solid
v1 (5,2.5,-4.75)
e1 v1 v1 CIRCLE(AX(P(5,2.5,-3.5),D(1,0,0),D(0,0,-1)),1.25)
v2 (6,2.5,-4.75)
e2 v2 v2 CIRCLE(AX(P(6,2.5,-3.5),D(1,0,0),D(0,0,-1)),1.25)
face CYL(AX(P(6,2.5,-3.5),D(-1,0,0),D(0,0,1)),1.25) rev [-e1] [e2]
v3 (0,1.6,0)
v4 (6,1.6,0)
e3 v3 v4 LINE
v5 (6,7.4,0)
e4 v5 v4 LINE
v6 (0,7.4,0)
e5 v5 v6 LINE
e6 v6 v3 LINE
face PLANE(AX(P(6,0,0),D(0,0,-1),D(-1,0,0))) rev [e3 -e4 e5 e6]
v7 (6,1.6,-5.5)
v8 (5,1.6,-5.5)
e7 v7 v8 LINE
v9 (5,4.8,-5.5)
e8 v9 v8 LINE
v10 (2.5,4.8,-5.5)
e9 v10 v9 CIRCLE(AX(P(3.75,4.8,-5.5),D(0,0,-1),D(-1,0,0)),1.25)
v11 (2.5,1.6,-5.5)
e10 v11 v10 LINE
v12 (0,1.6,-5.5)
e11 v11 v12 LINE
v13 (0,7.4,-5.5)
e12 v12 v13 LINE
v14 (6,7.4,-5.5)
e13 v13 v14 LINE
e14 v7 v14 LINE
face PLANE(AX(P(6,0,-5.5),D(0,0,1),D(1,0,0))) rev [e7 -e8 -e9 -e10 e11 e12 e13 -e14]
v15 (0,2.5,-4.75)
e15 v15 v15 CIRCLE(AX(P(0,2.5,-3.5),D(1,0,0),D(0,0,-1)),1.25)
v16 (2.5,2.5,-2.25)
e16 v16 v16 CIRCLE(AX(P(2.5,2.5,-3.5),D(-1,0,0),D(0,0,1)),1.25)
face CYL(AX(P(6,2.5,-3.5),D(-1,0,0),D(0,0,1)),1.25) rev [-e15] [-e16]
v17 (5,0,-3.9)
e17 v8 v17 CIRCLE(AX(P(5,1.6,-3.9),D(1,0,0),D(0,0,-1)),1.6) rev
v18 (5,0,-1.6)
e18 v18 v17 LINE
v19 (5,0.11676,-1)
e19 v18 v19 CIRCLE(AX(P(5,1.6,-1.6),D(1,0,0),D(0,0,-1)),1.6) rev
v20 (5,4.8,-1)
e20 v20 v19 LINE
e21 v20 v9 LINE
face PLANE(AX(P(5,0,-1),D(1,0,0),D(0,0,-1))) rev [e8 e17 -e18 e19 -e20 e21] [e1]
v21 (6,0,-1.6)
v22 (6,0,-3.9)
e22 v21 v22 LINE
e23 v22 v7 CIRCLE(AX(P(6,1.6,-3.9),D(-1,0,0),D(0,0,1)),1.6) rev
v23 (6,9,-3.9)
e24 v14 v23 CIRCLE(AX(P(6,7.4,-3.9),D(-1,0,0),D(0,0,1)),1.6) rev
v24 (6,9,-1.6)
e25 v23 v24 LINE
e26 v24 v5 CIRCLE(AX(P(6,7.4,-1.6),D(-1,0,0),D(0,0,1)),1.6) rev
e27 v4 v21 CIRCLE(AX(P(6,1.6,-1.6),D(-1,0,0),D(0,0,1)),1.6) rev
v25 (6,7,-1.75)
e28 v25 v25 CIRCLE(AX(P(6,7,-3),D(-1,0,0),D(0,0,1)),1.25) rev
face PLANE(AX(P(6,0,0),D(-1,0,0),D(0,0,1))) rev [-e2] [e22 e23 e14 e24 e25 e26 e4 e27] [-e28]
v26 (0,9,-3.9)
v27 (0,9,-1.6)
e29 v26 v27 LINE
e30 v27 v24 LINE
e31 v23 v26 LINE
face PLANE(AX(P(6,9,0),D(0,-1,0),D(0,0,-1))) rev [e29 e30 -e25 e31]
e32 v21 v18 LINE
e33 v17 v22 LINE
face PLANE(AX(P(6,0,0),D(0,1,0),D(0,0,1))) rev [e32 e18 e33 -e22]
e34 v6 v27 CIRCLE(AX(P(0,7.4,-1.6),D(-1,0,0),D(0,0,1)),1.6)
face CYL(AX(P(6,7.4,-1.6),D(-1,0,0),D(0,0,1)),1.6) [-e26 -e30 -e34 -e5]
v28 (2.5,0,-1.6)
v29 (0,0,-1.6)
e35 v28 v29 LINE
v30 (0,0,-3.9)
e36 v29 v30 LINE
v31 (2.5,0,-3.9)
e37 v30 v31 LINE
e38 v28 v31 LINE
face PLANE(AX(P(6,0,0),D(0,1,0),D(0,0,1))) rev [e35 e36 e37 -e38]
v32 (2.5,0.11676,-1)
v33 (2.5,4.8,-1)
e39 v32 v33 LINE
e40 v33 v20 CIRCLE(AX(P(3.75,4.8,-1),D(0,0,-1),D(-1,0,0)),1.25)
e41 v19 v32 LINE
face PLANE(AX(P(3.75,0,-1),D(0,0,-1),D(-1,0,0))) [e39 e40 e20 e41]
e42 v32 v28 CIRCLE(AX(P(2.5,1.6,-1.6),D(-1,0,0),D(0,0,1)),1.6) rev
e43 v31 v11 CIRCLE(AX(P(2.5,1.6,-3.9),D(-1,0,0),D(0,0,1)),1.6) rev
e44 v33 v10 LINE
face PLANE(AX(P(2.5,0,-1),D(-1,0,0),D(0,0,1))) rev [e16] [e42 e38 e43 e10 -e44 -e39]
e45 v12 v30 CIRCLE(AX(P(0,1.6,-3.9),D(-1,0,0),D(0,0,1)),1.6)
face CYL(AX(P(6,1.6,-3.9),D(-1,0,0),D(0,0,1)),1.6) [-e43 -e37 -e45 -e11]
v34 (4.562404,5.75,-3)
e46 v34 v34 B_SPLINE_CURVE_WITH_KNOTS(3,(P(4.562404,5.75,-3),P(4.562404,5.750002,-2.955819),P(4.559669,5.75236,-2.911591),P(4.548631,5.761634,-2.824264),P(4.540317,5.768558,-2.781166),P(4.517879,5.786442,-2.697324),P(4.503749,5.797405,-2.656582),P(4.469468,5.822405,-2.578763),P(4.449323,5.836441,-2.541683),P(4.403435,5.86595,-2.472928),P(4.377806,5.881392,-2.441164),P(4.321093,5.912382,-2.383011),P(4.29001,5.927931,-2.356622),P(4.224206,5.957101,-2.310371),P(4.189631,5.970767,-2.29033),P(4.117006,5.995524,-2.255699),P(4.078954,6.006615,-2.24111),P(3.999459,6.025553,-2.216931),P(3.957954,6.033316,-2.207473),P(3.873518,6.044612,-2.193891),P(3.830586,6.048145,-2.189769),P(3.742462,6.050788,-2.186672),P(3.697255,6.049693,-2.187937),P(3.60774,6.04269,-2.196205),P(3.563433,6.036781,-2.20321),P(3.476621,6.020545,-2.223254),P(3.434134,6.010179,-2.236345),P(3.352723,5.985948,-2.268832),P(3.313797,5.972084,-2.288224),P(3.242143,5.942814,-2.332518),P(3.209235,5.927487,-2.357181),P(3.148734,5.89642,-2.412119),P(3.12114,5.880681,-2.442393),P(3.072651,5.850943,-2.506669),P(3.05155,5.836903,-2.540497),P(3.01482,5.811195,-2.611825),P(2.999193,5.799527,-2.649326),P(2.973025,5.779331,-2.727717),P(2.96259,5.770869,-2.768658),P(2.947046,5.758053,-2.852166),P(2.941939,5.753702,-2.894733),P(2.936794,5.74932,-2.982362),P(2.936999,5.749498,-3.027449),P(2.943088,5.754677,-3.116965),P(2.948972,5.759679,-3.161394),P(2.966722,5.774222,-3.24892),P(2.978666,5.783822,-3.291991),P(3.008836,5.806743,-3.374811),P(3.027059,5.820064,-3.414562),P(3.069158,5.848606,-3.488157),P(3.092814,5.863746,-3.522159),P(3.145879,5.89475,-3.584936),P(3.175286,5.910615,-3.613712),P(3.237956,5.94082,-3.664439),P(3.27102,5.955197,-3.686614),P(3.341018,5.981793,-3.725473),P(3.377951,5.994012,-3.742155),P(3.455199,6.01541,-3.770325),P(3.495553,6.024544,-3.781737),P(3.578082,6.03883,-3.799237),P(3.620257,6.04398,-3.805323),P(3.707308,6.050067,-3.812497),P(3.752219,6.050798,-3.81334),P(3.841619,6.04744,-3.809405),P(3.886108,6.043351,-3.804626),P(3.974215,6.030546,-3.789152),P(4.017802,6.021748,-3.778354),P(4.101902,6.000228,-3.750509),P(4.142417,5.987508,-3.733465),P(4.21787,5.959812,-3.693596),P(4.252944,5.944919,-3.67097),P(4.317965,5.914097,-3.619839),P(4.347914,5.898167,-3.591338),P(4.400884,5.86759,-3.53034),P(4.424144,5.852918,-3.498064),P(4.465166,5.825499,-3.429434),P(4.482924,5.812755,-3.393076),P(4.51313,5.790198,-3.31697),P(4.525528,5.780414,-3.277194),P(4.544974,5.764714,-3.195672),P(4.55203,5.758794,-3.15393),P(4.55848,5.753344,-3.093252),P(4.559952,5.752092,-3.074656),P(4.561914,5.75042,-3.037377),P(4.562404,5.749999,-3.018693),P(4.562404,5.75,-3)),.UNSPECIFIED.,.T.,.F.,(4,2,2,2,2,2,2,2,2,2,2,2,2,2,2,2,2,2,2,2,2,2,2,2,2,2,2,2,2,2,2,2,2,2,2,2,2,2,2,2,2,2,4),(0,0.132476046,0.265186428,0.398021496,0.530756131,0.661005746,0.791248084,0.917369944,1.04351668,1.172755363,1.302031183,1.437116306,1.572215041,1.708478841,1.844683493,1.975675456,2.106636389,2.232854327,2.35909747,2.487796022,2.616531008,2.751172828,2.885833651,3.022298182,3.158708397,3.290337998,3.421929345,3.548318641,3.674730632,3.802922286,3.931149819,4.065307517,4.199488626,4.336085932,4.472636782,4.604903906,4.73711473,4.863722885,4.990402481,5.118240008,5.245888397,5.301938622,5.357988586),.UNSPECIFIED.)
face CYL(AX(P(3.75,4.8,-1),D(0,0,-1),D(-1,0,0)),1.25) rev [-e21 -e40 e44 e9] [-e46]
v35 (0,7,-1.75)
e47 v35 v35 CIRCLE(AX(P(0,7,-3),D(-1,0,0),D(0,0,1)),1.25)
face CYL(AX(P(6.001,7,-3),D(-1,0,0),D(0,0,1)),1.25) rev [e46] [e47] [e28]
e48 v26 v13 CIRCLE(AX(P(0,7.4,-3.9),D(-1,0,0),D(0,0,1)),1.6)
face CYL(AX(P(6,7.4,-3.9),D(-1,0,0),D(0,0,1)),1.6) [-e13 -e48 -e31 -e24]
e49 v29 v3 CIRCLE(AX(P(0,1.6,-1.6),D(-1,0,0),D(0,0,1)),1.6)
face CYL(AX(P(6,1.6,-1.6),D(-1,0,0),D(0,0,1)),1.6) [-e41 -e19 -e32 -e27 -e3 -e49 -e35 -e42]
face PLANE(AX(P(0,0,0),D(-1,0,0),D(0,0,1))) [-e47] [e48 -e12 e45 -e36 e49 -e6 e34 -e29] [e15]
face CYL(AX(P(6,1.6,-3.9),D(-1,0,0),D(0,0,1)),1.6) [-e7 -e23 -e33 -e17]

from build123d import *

# Parameters (mm, degrees)
SKETCH1_W           = 5.5
SKETCH1_H           = 9
SKETCH1_R           = 1.25
BOSS_EXTRUDE1_DEPTH = 6
CUT_EXTRUDE3_DEPTH  = 4.5
CUT_EXTRUDE4_REACH  = 14.135
SKETCH5_R           = 1.25
FILLET1_R           = 1.6


with BuildPart() as part:
    # Sketch1 → Boss-Extrude1 (new body)
    with BuildSketch(Plane(origin=(0, 0, 0), x_dir=(0, 0, -1), z_dir=(1, 0, 0))):
        with Locations((2.75, 4.5)):
            Rectangle(SKETCH1_W, SKETCH1_H)
        with Locations((3.5, 2.5)):
            Circle(SKETCH1_R, mode=Mode.SUBTRACT)
    extrude(amount=BOSS_EXTRUDE1_DEPTH)

    # Sketch4 → Cut-Extrude3 (cut)
    with BuildSketch(Plane(origin=(0, 0, -5.5), x_dir=(-1, 0, 0), z_dir=(0, 0, -1))):
        with BuildLine():
            Line((-5, 0), (-5, 4.8))
            ThreePointArc((-5, 4.8), (-3.75, 6.05), (-2.5, 4.8))
            Line((-2.5, 4.8), (-2.5, 0))
            ThreePointArc((-2.5, 0), (-3.75, -1.25), (-5, 0))
        make_face()
    extrude(amount=-CUT_EXTRUDE3_DEPTH, mode=Mode.SUBTRACT)

    # Sketch5 → Cut-Extrude4 (cut, up to next)
    with BuildSketch(Plane.ZY, mode=Mode.PRIVATE) as cut_extrude4_sk1:
        with Locations((-3, 7)):
            Circle(SKETCH5_R)
    cut_extrude4_tool1 = extrude(cut_extrude4_sk1.sketch, amount=-CUT_EXTRUDE4_REACH, mode=Mode.PRIVATE) & part.part
    add(cut_extrude4_tool1.solids().sort_by_distance((0, 7, -3))[0], mode=Mode.SUBTRACT)

    # Fillet1
    # the kernel refuses this fillet: 1.6 mm, written as the material it takes off along each edge
    with BuildSketch(Plane(origin=(-4, 0, 0), x_dir=(0, 0, -1), z_dir=(1, 0, 0)), Plane(origin=(-4, 9, 0), x_dir=(0, -1, 0), z_dir=(1, 0, 0))) as fillet1_piece_1:
        with BuildLine():
            CenterArc((FILLET1_R, FILLET1_R), FILLET1_R, 180, 90)
            Line((0, FILLET1_R), (0, 0))
            Line((0, 0), (FILLET1_R, 0))
        make_face()
    extrude(amount=14, mode=Mode.SUBTRACT)
    with BuildSketch(Plane(origin=(1, 0, -5.5), x_dir=(0, 0, 1), z_dir=(1, 0, 0))) as fillet1_piece_2:
        with BuildLine():
            CenterArc((FILLET1_R, -FILLET1_R), FILLET1_R, 90, 90)
            Line((0, -FILLET1_R), (0, 0))
            Line((0, 0), (FILLET1_R, 0))
        make_face()
    extrude(amount=9, mode=Mode.SUBTRACT)
    with BuildSketch(Plane(origin=(-4, 0, -5.5), x_dir=(0, 0, 1), z_dir=(1, 0, 0))) as fillet1_piece_3:
        with BuildLine():
            CenterArc((FILLET1_R, -FILLET1_R), FILLET1_R, 90, 90)
            Line((0, -FILLET1_R), (0, 0))
            Line((0, 0), (FILLET1_R, 0))
        make_face()
    extrude(amount=10.5, mode=Mode.SUBTRACT)
    with BuildSketch(Plane(origin=(-4, 9, -5.5), x_dir=(0, -1, 0), z_dir=(1, 0, 0))) as fillet1_piece_4:
        with BuildLine():
            CenterArc((FILLET1_R, -FILLET1_R), FILLET1_R, 90, 90)
            Line((0, -FILLET1_R), (0, 0))
            Line((0, 0), (FILLET1_R, 0))
        make_face()
    extrude(amount=14, mode=Mode.SUBTRACT)


solid = part.part
